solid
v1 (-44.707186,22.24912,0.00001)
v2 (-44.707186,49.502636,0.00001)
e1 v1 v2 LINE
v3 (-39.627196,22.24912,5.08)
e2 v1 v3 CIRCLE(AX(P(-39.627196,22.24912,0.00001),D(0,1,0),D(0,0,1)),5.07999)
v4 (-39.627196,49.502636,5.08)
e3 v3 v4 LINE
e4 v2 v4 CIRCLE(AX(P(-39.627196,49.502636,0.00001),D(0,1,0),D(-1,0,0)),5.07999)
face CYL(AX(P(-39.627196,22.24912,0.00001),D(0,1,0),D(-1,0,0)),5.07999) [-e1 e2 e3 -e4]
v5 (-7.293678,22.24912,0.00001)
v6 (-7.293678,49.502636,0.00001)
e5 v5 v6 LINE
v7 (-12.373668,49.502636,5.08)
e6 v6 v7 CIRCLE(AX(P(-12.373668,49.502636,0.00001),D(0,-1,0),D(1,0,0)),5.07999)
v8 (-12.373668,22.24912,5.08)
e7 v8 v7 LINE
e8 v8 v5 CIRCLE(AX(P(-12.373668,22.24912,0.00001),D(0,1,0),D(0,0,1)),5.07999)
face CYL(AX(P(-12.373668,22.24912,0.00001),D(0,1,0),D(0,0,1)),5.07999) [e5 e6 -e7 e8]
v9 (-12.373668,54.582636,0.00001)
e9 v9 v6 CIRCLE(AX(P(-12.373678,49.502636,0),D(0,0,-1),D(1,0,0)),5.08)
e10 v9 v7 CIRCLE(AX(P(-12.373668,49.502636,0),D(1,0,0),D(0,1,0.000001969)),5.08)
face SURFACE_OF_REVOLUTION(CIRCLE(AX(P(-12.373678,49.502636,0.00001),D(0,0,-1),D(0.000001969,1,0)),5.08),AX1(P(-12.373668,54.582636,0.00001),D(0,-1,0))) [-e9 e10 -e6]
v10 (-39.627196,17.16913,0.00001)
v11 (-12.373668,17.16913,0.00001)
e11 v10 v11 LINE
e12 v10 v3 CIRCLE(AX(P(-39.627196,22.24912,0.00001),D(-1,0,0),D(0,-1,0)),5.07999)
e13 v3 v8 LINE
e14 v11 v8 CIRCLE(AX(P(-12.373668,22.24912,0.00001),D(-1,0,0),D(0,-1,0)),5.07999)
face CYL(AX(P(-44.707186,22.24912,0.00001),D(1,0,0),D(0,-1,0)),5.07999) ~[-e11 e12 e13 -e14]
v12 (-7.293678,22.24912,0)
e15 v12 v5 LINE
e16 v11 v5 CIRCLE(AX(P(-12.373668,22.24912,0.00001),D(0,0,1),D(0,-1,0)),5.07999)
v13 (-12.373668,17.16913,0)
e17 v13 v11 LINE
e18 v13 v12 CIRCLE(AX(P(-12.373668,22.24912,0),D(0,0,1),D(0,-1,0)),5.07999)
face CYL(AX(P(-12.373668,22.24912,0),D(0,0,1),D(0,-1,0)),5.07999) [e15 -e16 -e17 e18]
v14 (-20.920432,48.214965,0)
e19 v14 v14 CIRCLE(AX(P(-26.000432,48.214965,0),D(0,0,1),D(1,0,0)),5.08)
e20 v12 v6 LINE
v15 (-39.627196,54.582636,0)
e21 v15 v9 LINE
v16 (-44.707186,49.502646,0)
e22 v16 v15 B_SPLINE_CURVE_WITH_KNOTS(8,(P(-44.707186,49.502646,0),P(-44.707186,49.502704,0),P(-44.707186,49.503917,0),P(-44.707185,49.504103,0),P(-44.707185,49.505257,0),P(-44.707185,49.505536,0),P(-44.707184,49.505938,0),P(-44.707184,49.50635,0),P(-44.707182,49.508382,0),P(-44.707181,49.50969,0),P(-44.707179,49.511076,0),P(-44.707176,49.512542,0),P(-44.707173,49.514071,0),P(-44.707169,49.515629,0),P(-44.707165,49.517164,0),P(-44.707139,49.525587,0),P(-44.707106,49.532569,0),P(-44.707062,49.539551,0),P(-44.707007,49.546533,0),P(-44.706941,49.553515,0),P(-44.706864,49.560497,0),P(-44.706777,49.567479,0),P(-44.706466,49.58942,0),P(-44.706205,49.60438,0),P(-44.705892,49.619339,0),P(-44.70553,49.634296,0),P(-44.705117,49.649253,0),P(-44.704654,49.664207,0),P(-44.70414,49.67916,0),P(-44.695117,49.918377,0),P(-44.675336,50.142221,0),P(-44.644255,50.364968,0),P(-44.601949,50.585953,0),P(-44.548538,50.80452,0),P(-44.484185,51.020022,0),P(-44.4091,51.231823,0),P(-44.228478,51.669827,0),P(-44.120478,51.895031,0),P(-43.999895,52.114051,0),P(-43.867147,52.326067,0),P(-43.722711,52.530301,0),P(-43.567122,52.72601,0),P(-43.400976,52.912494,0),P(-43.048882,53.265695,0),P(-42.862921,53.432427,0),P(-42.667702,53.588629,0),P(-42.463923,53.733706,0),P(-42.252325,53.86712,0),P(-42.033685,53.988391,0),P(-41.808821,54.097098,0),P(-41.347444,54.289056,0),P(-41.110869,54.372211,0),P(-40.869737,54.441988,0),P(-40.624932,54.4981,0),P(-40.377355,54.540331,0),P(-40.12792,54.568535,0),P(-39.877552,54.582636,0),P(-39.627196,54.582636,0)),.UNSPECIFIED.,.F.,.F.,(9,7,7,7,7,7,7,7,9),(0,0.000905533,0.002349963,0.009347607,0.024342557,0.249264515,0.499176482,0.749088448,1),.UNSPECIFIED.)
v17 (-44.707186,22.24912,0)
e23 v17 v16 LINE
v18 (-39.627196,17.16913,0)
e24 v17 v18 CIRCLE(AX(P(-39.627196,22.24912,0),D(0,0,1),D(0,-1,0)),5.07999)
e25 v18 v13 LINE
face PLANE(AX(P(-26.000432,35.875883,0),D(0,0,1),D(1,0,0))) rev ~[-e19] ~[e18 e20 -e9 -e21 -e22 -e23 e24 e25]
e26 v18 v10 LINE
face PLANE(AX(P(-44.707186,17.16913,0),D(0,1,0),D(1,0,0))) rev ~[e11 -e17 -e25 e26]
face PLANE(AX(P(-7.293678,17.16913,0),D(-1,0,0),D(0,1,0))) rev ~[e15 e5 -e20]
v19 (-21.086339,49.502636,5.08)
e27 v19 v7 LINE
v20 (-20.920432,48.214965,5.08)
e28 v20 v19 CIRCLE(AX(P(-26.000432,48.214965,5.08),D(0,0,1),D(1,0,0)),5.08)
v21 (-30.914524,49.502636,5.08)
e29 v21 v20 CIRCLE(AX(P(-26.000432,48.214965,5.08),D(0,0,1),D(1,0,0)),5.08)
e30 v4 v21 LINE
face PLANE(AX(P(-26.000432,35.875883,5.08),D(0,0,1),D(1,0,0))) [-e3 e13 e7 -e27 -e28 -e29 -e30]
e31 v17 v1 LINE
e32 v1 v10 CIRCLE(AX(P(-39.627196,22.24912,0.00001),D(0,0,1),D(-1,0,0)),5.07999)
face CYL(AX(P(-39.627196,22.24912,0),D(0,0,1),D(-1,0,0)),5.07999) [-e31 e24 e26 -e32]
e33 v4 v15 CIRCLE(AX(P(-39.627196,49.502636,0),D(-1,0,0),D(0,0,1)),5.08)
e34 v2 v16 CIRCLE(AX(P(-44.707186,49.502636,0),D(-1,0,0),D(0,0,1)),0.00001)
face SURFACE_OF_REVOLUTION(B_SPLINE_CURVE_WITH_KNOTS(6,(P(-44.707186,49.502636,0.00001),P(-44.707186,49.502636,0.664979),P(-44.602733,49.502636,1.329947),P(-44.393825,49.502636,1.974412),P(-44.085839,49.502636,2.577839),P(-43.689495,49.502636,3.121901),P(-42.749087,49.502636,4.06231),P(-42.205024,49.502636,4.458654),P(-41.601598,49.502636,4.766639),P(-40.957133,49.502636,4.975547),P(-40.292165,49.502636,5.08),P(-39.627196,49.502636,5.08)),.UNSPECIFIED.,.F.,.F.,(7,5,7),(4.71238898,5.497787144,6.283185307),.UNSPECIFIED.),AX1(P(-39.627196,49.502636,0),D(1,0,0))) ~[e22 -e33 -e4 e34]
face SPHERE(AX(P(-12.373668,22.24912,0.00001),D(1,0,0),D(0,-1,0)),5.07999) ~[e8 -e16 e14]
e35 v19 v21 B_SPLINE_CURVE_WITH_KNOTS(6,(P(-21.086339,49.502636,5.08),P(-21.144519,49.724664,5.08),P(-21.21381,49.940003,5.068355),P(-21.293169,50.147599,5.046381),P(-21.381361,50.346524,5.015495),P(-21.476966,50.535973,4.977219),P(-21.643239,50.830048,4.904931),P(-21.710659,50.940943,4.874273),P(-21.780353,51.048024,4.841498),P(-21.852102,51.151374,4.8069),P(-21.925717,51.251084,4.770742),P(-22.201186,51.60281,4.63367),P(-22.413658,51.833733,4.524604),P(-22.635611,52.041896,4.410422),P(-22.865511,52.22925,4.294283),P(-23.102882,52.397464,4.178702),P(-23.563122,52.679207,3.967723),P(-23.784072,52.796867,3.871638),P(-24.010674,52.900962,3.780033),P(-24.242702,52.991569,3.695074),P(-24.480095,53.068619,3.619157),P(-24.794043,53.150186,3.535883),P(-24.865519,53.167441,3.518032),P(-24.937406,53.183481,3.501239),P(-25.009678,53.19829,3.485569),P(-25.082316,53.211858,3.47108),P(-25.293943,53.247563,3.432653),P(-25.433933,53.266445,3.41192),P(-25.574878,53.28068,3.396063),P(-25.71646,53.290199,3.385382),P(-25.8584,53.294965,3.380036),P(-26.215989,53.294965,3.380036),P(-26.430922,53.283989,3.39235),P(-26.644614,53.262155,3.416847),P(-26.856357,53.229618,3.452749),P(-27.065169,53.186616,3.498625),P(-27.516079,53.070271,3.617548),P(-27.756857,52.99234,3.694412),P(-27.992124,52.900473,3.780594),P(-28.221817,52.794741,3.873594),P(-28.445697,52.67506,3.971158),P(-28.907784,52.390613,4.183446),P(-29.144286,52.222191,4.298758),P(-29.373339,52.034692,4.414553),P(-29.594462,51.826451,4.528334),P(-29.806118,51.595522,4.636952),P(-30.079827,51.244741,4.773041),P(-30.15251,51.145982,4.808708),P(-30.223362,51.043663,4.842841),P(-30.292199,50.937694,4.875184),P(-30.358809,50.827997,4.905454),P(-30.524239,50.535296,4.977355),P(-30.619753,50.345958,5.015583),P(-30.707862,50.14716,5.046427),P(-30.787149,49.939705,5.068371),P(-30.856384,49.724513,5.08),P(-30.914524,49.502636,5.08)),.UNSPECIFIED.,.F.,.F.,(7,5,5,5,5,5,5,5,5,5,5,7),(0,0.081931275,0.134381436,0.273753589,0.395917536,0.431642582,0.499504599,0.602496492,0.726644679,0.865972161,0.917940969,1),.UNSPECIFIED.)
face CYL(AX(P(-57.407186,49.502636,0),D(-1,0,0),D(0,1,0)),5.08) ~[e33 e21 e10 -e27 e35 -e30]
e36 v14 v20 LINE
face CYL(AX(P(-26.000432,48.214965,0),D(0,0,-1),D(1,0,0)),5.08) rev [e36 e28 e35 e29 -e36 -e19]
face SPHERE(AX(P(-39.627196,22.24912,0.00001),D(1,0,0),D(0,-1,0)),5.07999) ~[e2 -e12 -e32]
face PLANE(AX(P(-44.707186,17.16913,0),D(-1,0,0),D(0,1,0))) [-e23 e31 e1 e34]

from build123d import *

# Parameters (mm, degrees)
F0_W        = 37.4135075825
F0_H        = 37.4135057104
F0_R        = 5.08
F1_DEPTH    = 5.08
F2_R        = 5.07999
F3_R        = 5.07999
F4_T1_DEPTH = 57.7335175825
F4_T3_DEPTH = 25.40001
F4_T6_ANGLE = 90
F5_R        = 5.07999


# Not quite as in the source:
# - a fillet or chamfer that OpenCascade refuses, or shapes differently, is made with other operations: its cross-section is extruded or revolved along the edge and cut away or added
# - a fillet or chamfer is up to 0.001 mm smaller than in the source, because OpenCascade refuses the exact size


with BuildPart() as f1:
    # F0 (on Top) → F1 (new body)
    with BuildSketch(Plane.XY):
        with Locations((-26.0004317388, 35.8758829534)):
            Rectangle(F0_W, F0_H)
        with Locations((-26.0004317388, 48.2149645656)):
            Circle(F0_R, mode=Mode.SUBTRACT)
    extrude(amount=F1_DEPTH)

    # F2 (radius 5.08 in the source; OpenCascade refuses exactly that, so slightly less here)
    f2_edges = [f1.edges().sort_by_distance(p)[0] for p in [
        (-26.000432, 17.16913, 5.08),
    ]]
    fillet(f2_edges, radius=F2_R)

    # F3 (radius 5.08 in the source; OpenCascade refuses exactly that, so slightly less here)
    f3_edges = [f1.edges().sort_by_distance(p)[0] for p in [
        (-7.293678, 38.415878, 5.08),
    ]]
    fillet(f3_edges, radius=F3_R)

    # F4: fillet of radius 5.08 on 1 edges, made by hand

    # F4_s2 → F4_t1 (cut)
    with BuildSketch(Plane.YZ.offset(-57.40718553)):
        with BuildLine():
            ThreePointArc((54.5826358086, 0), (53.094738257, 3.5921024484), (49.5026358086, 5.08))
            Line((49.5026358086, 5.08), (54.5826358086, 5.08))
            Line((54.5826358086, 5.08), (54.5826358086, 0))
        make_face()
    extrude(amount=F4_T1_DEPTH, mode=Mode.SUBTRACT)

    # F4_s4 → F4_t3 (cut)
    with BuildSketch(Plane.XY.offset(-12.7)):
        with BuildLine():
            ThreePointArc((-7.2936779475, 49.5026358086), (-8.7815754991, 53.094738257), (-12.3736779475, 54.5826358086))
            Line((-12.3736779475, 54.5826358086), (-7.2936779475, 54.5826358086))
            Line((-7.2936779475, 54.5826358086), (-7.2936779475, 49.5026358086))
        make_face()
    extrude(amount=F4_T3_DEPTH, mode=Mode.SUBTRACT)

    # F4_s5 → F4_t6 (revolve, cut)
    with BuildSketch(Plane.XY.offset(1e-05)):
        with BuildLine():
            ThreePointArc((-12.3736679475, 54.5826358086), (-8.7815719636, 53.0947347215), (-7.2936779475, 49.5026358086))
            Line((-7.2936779475, 49.5026358086), (-7.2936779475, 54.5826358086))
            Line((-7.2936779475, 54.5826358086), (-12.3736679475, 54.5826358086))
        make_face()
    revolve(axis=Axis((-12.3736679475, 54.5826358086, 1e-05), (0, -1, 0)), revolution_arc=F4_T6_ANGLE, mode=Mode.SUBTRACT)

    # F5 (radius 5.08 in the source; OpenCascade refuses exactly that, so slightly less here)
    f5_edges = [f1.edges().sort_by_distance(p)[0] for p in [
        (-44.707186, 35.875878, 5.08),
        (-44.707186, 17.16913, 5e-06),
        (-44.707186, 18.657025, 3.592105),
        (-44.707186, 53.094738, 3.592102),
    ]]
    fillet(f5_edges, radius=F5_R)


solid = f1.part
